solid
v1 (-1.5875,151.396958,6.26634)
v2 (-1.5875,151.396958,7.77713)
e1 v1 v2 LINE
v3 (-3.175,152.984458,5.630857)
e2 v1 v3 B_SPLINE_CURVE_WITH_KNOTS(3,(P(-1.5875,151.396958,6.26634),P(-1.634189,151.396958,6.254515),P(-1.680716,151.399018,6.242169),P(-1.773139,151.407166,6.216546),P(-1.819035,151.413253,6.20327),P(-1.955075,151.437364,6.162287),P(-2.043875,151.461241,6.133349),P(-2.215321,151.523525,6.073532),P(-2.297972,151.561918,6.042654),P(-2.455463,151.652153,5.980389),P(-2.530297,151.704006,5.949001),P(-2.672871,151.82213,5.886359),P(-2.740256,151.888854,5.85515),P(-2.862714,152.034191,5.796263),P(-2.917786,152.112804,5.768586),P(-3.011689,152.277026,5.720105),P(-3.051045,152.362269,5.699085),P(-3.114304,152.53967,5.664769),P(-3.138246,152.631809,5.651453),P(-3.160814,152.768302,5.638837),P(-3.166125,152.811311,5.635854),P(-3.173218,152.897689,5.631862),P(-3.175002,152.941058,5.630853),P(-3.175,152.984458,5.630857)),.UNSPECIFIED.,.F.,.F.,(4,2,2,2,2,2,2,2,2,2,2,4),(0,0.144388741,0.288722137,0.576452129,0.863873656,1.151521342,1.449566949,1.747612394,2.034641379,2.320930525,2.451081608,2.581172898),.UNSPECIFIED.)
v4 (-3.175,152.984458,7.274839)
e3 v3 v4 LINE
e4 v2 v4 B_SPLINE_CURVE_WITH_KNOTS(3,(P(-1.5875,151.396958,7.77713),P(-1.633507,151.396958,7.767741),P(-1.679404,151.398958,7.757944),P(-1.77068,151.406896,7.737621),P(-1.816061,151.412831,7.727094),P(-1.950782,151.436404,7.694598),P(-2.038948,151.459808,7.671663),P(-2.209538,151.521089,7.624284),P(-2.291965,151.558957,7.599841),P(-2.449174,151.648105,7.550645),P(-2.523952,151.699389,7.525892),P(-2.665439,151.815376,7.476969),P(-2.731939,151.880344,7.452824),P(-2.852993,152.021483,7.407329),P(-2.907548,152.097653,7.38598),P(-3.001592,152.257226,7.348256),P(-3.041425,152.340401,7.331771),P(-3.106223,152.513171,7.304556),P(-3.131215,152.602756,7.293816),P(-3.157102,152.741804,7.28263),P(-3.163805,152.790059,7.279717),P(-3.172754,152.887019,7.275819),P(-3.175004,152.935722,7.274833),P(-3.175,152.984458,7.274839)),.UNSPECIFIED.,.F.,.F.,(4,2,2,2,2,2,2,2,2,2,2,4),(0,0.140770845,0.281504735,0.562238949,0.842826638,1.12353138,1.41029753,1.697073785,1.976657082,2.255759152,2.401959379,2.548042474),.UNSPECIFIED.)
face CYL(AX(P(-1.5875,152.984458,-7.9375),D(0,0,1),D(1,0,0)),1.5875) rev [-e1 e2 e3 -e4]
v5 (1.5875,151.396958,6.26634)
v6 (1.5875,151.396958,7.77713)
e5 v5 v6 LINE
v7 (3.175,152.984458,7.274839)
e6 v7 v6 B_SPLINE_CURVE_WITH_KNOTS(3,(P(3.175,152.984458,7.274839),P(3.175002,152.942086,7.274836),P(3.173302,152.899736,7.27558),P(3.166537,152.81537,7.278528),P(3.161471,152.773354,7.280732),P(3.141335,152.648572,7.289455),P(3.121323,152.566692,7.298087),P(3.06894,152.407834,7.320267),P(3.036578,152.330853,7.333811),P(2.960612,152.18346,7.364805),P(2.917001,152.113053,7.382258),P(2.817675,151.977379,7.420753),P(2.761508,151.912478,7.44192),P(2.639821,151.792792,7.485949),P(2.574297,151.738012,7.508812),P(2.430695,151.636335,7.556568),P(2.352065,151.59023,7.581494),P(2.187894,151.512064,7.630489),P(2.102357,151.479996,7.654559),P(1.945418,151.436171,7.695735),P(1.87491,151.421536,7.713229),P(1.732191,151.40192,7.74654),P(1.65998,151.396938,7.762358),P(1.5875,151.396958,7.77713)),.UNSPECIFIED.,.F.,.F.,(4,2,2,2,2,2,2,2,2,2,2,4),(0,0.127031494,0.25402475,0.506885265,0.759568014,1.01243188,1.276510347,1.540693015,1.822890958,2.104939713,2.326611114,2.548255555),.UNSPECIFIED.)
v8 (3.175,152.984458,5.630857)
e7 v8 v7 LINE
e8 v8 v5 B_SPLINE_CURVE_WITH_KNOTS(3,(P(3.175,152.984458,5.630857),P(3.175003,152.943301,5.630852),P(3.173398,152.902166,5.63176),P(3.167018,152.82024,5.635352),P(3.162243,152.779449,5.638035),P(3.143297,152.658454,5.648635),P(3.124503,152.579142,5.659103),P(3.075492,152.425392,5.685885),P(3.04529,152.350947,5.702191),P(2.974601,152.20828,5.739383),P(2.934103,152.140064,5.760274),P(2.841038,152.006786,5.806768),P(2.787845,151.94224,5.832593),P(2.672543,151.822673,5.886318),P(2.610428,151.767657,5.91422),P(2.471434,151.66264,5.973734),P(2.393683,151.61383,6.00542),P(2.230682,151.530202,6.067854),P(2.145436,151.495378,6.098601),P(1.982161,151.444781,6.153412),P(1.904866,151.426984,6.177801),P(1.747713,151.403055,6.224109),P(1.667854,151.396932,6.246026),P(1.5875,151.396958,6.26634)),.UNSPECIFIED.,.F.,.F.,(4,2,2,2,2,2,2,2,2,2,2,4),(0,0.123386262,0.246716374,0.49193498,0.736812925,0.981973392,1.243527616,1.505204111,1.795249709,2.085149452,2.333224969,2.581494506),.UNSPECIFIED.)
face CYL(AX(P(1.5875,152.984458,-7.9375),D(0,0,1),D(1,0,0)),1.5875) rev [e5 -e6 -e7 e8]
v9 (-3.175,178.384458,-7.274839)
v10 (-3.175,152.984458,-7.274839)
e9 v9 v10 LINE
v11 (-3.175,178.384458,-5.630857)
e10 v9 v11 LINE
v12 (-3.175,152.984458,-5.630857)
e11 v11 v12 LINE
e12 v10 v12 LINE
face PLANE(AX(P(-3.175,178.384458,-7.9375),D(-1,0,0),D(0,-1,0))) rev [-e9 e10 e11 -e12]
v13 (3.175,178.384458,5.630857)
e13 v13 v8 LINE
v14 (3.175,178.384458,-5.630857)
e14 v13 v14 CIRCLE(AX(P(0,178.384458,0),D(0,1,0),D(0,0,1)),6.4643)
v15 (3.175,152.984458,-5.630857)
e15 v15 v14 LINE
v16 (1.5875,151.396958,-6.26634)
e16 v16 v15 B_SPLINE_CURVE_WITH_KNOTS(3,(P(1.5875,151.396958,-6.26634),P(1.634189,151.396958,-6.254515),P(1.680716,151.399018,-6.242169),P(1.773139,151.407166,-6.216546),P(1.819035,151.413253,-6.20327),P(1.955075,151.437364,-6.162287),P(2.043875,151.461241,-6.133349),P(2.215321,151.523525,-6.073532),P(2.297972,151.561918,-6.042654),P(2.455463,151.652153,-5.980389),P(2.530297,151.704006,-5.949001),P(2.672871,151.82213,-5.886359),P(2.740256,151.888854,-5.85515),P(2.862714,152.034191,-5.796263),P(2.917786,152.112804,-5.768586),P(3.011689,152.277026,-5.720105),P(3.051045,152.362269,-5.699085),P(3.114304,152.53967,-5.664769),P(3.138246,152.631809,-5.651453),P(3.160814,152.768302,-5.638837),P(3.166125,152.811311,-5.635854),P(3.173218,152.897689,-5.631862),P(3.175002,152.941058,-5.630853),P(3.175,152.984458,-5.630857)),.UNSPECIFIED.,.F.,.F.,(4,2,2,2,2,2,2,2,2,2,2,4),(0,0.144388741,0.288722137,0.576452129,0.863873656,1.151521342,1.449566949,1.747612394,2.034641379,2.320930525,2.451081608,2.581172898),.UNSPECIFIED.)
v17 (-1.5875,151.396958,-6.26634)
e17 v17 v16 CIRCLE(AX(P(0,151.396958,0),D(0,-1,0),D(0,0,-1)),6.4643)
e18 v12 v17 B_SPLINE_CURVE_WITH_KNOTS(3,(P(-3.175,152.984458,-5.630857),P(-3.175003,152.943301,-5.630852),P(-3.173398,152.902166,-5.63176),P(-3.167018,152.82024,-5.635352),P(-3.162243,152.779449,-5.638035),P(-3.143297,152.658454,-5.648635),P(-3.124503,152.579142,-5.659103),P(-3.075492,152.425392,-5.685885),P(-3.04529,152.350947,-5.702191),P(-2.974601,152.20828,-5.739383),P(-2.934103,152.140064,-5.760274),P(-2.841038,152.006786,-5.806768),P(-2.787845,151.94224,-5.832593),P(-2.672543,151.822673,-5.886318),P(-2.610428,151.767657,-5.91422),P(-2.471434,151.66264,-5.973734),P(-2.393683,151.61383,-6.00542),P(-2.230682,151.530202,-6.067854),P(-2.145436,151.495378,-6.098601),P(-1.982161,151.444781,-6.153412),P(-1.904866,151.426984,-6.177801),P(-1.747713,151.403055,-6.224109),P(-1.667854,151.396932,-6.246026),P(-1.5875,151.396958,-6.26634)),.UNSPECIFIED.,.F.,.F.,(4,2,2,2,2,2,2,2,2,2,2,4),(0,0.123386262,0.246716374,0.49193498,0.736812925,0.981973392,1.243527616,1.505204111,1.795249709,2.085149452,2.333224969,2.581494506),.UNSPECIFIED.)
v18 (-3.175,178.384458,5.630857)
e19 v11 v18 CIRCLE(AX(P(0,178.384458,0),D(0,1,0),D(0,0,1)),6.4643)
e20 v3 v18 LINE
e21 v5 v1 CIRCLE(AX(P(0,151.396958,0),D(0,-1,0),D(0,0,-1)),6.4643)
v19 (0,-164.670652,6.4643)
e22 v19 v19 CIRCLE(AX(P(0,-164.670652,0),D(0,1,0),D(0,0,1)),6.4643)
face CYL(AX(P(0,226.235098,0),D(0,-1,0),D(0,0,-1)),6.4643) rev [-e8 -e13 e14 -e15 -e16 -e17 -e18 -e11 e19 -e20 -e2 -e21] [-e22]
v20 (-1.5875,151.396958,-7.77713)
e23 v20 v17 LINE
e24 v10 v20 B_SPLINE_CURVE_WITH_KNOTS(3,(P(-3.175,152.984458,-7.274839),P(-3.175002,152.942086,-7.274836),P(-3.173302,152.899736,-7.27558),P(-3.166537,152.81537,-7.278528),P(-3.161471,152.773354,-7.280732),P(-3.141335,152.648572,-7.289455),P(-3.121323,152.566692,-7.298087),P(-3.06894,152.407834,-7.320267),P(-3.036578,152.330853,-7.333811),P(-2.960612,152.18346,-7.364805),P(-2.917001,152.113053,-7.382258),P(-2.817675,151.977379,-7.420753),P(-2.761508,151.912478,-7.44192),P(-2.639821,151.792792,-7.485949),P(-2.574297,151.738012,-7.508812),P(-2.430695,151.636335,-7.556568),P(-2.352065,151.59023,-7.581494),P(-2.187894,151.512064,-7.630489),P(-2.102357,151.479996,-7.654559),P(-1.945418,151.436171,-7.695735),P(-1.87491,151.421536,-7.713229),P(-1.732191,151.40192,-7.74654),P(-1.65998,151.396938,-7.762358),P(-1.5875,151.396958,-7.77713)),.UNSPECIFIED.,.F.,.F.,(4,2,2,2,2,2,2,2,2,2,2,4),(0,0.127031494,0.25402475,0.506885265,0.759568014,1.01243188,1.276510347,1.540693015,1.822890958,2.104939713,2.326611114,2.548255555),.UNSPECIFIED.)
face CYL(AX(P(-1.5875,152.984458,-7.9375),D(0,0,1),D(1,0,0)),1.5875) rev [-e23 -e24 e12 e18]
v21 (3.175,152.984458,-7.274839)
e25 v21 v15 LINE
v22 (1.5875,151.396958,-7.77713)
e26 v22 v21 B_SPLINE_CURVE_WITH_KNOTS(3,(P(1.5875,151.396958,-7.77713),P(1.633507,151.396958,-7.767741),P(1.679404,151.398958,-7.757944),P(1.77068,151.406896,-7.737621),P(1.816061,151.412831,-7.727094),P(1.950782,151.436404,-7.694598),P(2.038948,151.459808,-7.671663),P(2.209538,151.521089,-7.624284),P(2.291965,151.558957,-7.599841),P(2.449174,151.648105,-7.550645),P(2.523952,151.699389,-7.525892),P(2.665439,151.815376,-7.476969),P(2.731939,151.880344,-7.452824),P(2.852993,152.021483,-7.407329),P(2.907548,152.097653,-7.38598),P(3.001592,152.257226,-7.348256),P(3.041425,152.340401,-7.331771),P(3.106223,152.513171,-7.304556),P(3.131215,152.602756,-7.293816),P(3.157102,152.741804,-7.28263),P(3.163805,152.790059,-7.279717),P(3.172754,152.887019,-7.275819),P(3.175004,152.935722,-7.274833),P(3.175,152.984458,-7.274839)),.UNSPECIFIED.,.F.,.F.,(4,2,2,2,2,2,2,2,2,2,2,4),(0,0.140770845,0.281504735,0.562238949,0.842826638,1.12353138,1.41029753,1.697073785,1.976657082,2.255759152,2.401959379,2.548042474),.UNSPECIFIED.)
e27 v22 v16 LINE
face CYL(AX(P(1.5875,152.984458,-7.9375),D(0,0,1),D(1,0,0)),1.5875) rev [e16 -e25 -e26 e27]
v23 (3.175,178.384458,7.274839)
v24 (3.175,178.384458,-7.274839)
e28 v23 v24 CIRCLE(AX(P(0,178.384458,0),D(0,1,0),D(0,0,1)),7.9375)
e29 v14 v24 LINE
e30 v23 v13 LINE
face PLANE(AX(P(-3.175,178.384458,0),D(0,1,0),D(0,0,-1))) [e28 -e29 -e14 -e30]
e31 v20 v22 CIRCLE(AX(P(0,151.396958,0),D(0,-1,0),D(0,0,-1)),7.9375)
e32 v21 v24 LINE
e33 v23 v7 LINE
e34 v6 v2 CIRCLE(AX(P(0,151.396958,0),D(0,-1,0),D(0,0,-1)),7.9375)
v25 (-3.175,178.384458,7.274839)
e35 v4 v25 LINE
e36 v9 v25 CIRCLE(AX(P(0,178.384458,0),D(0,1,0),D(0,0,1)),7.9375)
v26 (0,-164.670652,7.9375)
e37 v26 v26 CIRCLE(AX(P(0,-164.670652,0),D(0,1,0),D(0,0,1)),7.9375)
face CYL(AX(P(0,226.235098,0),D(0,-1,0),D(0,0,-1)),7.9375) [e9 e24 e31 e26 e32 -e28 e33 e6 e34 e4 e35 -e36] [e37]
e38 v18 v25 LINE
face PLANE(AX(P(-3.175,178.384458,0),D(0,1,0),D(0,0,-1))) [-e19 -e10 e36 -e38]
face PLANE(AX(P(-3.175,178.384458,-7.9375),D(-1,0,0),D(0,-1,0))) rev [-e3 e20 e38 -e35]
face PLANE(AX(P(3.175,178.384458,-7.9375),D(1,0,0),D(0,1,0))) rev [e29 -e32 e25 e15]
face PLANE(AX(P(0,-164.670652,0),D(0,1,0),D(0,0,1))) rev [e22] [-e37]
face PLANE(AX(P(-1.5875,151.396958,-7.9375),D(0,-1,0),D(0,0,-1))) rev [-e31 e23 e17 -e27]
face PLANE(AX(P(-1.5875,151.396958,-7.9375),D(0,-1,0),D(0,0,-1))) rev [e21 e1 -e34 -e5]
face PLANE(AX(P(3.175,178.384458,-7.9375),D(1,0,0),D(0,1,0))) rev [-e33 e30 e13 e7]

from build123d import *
from OCP.BRepAlgoAPI import BRepAlgoAPI_Cut
from OCP.TopTools import TopTools_ListOfShape

# Parameters (mm, degrees)
BOSS_EXTRUDE1_START     = -164.670652
SKETCH1_R               = 7.9375
SKETCH1_R_2             = 6.4643
BOSS_EXTRUDE1_DEPTH     = 343.055109872
CUT_EXTRUDE1_DEPTH      = 179.737300592
CUT_EXTRUDE1_DEPTH_BACK = 179.737300592


with BuildPart() as part:
    # Sketch1 → Boss-Extrude1 (new body)
    with BuildSketch(Plane(origin=(0, 0, 0), x_dir=(1, 0, 0), z_dir=(0, 1, 0)).offset(BOSS_EXTRUDE1_START)):
        with Locations(Location((0, 0, 0), (0, 0, 270))):
            Circle(SKETCH1_R)
        with Locations(Location((0, 0, 0), (0, 0, 270))):
            Circle(SKETCH1_R_2, mode=Mode.SUBTRACT)
    extrude(amount=BOSS_EXTRUDE1_DEPTH)


with BuildPart() as cut_extrude1_tool:
    # Sketch2 → Cut-Extrude1 (new, two sides: drawn at the far end of the back side and taken through both)
    with BuildSketch(Plane.XY.offset(-CUT_EXTRUDE1_DEPTH_BACK)):
        with BuildLine():
            Line((-3.175, 178.384457539), (3.175, 178.384457539))
            Line((3.175, 178.384457539), (3.175, 152.984457539))
            ThreePointArc((3.175, 152.984457539), (2.710032015, 151.861925524), (1.5875, 151.396957539))
            Line((1.5875, 151.396957539), (-1.5875, 151.396957539))
            ThreePointArc((-1.5875, 151.396957539), (-2.710032015, 151.861925524), (-3.175, 152.984457539))
            Line((-3.175, 152.984457539), (-3.175, 178.384457539))
        make_face()
    extrude(amount=CUT_EXTRUDE1_DEPTH + CUT_EXTRUDE1_DEPTH_BACK)


with BuildPart() as part_1:
    add(part.part)

    # Cut-Extrude1: cut by cut_extrude1_tool, with a tolerance
    cut_extrude1_stock = TopTools_ListOfShape()
    cut_extrude1_stock.Append(part_1.part.wrapped)
    cut_extrude1_tools = TopTools_ListOfShape()
    cut_extrude1_tools.Append(cut_extrude1_tool.part.wrapped)
    cut_extrude1_cut = BRepAlgoAPI_Cut()
    cut_extrude1_cut.SetArguments(cut_extrude1_stock)
    cut_extrude1_cut.SetTools(cut_extrude1_tools)
    cut_extrude1_cut.SetFuzzyValue(0.00001)
    cut_extrude1_cut.Build()
    add(Compound.cast(cut_extrude1_cut.Shape()).solids(), mode=Mode.REPLACE)


solid = part_1.part
